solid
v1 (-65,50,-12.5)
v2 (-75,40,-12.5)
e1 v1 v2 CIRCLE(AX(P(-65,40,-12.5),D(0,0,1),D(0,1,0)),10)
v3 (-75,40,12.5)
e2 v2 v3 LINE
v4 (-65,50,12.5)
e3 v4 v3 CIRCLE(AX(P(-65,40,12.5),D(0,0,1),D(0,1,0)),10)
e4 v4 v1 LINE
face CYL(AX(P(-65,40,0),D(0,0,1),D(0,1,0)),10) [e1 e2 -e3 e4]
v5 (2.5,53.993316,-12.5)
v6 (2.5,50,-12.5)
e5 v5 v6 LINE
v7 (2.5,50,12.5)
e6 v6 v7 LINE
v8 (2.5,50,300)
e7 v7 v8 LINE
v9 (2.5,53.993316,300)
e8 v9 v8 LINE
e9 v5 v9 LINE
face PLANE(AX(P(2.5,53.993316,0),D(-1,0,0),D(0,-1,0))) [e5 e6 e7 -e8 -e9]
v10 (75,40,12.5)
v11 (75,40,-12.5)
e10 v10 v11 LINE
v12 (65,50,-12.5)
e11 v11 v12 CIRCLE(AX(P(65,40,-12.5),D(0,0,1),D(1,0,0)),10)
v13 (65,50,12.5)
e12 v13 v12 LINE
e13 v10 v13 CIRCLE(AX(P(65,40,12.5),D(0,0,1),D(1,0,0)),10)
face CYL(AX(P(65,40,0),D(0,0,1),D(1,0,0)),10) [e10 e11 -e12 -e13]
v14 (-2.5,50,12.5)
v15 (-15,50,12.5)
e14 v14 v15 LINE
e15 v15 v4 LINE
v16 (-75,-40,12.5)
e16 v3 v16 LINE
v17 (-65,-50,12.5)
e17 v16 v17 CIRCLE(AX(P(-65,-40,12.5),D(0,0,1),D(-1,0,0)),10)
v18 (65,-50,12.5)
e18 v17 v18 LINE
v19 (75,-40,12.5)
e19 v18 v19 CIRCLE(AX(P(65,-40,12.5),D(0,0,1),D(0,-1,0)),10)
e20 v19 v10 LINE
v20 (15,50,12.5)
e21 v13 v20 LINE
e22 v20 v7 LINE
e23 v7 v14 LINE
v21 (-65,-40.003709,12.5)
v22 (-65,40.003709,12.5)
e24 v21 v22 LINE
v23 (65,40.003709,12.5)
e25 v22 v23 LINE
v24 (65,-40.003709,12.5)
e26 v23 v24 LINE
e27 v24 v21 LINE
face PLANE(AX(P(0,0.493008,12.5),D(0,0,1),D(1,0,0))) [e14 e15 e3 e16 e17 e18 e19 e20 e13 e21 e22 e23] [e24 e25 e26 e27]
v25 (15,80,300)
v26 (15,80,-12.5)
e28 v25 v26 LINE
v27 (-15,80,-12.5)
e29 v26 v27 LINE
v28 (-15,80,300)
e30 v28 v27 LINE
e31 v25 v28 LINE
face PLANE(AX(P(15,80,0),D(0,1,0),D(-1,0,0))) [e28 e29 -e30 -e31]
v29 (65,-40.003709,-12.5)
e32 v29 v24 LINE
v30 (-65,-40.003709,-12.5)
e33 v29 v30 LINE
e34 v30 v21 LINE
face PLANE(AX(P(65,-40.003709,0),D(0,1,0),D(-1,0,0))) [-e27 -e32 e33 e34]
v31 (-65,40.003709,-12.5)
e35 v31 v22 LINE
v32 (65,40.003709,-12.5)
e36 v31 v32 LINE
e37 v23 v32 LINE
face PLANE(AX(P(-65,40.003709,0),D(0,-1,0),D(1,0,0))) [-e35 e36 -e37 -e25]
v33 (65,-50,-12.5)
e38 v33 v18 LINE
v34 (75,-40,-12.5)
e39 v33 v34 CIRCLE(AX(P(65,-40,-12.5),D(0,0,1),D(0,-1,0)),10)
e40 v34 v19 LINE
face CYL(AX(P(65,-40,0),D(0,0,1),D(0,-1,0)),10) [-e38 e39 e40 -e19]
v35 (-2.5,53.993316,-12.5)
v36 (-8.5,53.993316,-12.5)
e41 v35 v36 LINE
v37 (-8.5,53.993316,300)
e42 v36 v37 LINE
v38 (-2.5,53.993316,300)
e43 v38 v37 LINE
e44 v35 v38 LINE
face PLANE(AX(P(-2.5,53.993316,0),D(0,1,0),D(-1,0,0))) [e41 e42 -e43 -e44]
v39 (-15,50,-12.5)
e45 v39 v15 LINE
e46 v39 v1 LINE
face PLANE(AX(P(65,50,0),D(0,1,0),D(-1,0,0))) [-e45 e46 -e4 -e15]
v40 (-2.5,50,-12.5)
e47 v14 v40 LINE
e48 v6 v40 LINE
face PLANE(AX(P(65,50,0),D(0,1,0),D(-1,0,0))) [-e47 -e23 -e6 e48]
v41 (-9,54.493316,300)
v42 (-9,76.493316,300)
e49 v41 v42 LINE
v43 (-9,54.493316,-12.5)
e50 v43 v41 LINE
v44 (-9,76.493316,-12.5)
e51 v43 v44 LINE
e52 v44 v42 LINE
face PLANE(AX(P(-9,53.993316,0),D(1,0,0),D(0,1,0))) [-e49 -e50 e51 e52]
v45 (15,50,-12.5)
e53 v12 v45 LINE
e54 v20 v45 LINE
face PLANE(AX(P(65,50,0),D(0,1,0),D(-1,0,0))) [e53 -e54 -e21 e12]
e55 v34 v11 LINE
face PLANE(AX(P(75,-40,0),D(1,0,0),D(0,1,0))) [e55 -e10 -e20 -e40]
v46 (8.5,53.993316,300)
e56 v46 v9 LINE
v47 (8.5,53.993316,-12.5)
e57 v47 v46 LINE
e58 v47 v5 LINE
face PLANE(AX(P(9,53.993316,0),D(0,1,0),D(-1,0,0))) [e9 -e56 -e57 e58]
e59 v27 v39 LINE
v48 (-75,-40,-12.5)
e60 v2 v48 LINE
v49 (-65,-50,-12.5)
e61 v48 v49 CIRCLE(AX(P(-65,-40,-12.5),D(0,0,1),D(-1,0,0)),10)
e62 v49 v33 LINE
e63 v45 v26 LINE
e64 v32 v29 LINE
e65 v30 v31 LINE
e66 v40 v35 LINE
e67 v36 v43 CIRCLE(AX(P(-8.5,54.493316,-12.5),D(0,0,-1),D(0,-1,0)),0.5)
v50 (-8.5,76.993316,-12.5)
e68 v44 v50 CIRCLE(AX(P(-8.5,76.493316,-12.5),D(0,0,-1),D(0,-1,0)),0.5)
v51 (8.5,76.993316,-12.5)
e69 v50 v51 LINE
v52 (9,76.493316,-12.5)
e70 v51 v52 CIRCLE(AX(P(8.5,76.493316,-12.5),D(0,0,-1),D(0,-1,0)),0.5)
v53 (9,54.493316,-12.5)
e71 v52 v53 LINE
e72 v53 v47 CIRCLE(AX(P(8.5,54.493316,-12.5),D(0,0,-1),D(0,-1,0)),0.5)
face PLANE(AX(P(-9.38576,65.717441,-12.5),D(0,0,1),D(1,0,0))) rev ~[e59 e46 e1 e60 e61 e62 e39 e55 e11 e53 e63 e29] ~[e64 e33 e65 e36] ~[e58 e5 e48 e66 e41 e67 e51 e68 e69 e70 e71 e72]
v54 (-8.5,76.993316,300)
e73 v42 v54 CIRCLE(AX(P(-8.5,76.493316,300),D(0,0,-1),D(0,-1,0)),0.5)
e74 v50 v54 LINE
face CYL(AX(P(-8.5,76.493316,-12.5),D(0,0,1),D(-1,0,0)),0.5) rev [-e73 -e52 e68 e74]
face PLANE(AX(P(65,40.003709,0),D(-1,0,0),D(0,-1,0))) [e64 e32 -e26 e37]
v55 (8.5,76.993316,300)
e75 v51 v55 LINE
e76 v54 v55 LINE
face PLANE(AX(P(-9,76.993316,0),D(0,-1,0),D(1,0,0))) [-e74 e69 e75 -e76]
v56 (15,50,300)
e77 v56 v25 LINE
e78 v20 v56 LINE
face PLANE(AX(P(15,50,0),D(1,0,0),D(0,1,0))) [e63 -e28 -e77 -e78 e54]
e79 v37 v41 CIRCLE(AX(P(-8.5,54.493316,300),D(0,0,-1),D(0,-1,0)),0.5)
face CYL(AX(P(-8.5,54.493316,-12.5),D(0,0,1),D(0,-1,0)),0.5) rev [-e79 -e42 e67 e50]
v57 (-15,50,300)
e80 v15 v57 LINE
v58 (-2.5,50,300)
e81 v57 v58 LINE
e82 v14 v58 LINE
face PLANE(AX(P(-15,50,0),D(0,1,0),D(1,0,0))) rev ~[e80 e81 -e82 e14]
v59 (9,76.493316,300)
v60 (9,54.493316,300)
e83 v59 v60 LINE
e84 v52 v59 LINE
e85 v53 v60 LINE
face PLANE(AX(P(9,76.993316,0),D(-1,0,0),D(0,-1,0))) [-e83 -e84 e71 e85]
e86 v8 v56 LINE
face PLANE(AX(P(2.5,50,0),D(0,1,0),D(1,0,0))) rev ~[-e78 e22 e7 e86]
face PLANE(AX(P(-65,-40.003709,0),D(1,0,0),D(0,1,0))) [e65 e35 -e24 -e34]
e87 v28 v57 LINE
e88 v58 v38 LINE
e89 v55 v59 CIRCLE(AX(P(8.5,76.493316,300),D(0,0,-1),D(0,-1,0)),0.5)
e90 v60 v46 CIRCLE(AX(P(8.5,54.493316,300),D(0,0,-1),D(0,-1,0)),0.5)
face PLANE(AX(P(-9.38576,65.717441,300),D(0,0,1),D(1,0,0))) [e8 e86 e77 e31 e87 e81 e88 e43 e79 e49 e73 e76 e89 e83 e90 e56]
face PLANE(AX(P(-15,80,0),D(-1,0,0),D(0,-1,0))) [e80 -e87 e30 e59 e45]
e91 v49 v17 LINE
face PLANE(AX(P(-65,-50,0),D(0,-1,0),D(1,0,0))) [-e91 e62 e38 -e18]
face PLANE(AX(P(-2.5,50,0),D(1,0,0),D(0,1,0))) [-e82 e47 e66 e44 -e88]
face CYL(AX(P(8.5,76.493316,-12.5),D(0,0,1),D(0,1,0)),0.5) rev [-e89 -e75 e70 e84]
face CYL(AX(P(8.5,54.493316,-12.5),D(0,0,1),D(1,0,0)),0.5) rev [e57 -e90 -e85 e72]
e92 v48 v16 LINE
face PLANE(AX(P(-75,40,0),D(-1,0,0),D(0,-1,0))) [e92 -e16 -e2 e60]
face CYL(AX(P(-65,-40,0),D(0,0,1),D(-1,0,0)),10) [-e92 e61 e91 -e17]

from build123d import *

# Parameters (mm, degrees)
F1_DEPTH      = 12.5
F2_DEPTH      = 300
F2_DEPTH_BACK = 12.5
F0_R          = 6
F3_DEPTH      = 50
F4_R          = 0.5


# Not quite as in the source:
# - a feature names something its author has since deleted; it is built from what else it names


with BuildPart() as f1:
    # F0 (on Top) → F1 (new body, symmetric)
    with BuildSketch(Plane.XY):
        with BuildLine():
            Line((-15, 50), (-65, 50))
            ThreePointArc((-65, 50), (-72.0710678119, 47.0710678119), (-75, 40))
            Line((-75, 40), (-75, -40))
            ThreePointArc((-75, -40), (-72.0710678119, -47.0710678119), (-65, -50))
            Line((-65, -50), (65, -50))
            ThreePointArc((65, -50), (72.0710678119, -47.0710678119), (75, -40))
            Line((75, -40), (75, 40))
            ThreePointArc((75, 40), (72.0710678119, 47.0710678119), (65, 50))
            Line((65, 50), (15, 50))
            Line((15, 50), (2.5, 50))
            Line((2.5, 50), (2.5, 40.0037090484))
            Line((2.5, 40.0037090484), (65, 40.0037090484))
            Line((65, 40.0037090484), (65, -40.0037090484))
            Line((65, -40.0037090484), (-65, -40.0037090484))
            Line((-65, -40.0037090484), (-65, 40.0037090484))
            Line((-65, 40.0037090484), (-2.5, 40.0037090484))
            Line((-2.5, 40.0037090484), (-2.5, 50))
            Line((-2.5, 50), (-15, 50))
        make_face()
        Polygon((2.5, 50), (-2.5, 50), (-2.5, 40.0037090484), (0, 40.0037090484), (2.5, 40.0037090484), align=None)
    extrude(amount=F1_DEPTH, both=True)

    # F0 (on Top) → F2 (join, two sides)
    with BuildSketch(Plane.XY) as f2_sk:
        Polygon((-15, 80), (-15, 50), (-2.5, 50), (-2.5, 53.9933157269), (-9, 53.9933157269), (-9, 76.9933157269), (0, 76.9933157269), (0, 79.2549662558), (0, 80), align=None)
        Polygon((2.5, 53.9933157269), (2.5, 50), (15, 50), (15, 80), (0, 80), (0, 79.2549662558), (0, 76.9933157269), (9, 76.9933157269), (9, 53.9933157269), align=None)
    extrude(amount=F2_DEPTH)
    extrude(f2_sk.sketch, amount=-F2_DEPTH_BACK)

    # F0 (on Top) → F3 (cut)
    with BuildSketch(Plane.XY):
        with Locations((0, 69.7)):
            Circle(F0_R)
    extrude(amount=F3_DEPTH, mode=Mode.SUBTRACT)

    # F4
    f4_edges = [f1.edges().sort_by_distance(p)[0] for p in [
        (-9, 76.993316, 143.75),
        (9, 76.993316, 143.75),
        (-9, 53.993316, 143.75),
        (9, 53.993316, 143.75),
    ]]
    fillet(f4_edges, radius=F4_R)


solid = f1.part
